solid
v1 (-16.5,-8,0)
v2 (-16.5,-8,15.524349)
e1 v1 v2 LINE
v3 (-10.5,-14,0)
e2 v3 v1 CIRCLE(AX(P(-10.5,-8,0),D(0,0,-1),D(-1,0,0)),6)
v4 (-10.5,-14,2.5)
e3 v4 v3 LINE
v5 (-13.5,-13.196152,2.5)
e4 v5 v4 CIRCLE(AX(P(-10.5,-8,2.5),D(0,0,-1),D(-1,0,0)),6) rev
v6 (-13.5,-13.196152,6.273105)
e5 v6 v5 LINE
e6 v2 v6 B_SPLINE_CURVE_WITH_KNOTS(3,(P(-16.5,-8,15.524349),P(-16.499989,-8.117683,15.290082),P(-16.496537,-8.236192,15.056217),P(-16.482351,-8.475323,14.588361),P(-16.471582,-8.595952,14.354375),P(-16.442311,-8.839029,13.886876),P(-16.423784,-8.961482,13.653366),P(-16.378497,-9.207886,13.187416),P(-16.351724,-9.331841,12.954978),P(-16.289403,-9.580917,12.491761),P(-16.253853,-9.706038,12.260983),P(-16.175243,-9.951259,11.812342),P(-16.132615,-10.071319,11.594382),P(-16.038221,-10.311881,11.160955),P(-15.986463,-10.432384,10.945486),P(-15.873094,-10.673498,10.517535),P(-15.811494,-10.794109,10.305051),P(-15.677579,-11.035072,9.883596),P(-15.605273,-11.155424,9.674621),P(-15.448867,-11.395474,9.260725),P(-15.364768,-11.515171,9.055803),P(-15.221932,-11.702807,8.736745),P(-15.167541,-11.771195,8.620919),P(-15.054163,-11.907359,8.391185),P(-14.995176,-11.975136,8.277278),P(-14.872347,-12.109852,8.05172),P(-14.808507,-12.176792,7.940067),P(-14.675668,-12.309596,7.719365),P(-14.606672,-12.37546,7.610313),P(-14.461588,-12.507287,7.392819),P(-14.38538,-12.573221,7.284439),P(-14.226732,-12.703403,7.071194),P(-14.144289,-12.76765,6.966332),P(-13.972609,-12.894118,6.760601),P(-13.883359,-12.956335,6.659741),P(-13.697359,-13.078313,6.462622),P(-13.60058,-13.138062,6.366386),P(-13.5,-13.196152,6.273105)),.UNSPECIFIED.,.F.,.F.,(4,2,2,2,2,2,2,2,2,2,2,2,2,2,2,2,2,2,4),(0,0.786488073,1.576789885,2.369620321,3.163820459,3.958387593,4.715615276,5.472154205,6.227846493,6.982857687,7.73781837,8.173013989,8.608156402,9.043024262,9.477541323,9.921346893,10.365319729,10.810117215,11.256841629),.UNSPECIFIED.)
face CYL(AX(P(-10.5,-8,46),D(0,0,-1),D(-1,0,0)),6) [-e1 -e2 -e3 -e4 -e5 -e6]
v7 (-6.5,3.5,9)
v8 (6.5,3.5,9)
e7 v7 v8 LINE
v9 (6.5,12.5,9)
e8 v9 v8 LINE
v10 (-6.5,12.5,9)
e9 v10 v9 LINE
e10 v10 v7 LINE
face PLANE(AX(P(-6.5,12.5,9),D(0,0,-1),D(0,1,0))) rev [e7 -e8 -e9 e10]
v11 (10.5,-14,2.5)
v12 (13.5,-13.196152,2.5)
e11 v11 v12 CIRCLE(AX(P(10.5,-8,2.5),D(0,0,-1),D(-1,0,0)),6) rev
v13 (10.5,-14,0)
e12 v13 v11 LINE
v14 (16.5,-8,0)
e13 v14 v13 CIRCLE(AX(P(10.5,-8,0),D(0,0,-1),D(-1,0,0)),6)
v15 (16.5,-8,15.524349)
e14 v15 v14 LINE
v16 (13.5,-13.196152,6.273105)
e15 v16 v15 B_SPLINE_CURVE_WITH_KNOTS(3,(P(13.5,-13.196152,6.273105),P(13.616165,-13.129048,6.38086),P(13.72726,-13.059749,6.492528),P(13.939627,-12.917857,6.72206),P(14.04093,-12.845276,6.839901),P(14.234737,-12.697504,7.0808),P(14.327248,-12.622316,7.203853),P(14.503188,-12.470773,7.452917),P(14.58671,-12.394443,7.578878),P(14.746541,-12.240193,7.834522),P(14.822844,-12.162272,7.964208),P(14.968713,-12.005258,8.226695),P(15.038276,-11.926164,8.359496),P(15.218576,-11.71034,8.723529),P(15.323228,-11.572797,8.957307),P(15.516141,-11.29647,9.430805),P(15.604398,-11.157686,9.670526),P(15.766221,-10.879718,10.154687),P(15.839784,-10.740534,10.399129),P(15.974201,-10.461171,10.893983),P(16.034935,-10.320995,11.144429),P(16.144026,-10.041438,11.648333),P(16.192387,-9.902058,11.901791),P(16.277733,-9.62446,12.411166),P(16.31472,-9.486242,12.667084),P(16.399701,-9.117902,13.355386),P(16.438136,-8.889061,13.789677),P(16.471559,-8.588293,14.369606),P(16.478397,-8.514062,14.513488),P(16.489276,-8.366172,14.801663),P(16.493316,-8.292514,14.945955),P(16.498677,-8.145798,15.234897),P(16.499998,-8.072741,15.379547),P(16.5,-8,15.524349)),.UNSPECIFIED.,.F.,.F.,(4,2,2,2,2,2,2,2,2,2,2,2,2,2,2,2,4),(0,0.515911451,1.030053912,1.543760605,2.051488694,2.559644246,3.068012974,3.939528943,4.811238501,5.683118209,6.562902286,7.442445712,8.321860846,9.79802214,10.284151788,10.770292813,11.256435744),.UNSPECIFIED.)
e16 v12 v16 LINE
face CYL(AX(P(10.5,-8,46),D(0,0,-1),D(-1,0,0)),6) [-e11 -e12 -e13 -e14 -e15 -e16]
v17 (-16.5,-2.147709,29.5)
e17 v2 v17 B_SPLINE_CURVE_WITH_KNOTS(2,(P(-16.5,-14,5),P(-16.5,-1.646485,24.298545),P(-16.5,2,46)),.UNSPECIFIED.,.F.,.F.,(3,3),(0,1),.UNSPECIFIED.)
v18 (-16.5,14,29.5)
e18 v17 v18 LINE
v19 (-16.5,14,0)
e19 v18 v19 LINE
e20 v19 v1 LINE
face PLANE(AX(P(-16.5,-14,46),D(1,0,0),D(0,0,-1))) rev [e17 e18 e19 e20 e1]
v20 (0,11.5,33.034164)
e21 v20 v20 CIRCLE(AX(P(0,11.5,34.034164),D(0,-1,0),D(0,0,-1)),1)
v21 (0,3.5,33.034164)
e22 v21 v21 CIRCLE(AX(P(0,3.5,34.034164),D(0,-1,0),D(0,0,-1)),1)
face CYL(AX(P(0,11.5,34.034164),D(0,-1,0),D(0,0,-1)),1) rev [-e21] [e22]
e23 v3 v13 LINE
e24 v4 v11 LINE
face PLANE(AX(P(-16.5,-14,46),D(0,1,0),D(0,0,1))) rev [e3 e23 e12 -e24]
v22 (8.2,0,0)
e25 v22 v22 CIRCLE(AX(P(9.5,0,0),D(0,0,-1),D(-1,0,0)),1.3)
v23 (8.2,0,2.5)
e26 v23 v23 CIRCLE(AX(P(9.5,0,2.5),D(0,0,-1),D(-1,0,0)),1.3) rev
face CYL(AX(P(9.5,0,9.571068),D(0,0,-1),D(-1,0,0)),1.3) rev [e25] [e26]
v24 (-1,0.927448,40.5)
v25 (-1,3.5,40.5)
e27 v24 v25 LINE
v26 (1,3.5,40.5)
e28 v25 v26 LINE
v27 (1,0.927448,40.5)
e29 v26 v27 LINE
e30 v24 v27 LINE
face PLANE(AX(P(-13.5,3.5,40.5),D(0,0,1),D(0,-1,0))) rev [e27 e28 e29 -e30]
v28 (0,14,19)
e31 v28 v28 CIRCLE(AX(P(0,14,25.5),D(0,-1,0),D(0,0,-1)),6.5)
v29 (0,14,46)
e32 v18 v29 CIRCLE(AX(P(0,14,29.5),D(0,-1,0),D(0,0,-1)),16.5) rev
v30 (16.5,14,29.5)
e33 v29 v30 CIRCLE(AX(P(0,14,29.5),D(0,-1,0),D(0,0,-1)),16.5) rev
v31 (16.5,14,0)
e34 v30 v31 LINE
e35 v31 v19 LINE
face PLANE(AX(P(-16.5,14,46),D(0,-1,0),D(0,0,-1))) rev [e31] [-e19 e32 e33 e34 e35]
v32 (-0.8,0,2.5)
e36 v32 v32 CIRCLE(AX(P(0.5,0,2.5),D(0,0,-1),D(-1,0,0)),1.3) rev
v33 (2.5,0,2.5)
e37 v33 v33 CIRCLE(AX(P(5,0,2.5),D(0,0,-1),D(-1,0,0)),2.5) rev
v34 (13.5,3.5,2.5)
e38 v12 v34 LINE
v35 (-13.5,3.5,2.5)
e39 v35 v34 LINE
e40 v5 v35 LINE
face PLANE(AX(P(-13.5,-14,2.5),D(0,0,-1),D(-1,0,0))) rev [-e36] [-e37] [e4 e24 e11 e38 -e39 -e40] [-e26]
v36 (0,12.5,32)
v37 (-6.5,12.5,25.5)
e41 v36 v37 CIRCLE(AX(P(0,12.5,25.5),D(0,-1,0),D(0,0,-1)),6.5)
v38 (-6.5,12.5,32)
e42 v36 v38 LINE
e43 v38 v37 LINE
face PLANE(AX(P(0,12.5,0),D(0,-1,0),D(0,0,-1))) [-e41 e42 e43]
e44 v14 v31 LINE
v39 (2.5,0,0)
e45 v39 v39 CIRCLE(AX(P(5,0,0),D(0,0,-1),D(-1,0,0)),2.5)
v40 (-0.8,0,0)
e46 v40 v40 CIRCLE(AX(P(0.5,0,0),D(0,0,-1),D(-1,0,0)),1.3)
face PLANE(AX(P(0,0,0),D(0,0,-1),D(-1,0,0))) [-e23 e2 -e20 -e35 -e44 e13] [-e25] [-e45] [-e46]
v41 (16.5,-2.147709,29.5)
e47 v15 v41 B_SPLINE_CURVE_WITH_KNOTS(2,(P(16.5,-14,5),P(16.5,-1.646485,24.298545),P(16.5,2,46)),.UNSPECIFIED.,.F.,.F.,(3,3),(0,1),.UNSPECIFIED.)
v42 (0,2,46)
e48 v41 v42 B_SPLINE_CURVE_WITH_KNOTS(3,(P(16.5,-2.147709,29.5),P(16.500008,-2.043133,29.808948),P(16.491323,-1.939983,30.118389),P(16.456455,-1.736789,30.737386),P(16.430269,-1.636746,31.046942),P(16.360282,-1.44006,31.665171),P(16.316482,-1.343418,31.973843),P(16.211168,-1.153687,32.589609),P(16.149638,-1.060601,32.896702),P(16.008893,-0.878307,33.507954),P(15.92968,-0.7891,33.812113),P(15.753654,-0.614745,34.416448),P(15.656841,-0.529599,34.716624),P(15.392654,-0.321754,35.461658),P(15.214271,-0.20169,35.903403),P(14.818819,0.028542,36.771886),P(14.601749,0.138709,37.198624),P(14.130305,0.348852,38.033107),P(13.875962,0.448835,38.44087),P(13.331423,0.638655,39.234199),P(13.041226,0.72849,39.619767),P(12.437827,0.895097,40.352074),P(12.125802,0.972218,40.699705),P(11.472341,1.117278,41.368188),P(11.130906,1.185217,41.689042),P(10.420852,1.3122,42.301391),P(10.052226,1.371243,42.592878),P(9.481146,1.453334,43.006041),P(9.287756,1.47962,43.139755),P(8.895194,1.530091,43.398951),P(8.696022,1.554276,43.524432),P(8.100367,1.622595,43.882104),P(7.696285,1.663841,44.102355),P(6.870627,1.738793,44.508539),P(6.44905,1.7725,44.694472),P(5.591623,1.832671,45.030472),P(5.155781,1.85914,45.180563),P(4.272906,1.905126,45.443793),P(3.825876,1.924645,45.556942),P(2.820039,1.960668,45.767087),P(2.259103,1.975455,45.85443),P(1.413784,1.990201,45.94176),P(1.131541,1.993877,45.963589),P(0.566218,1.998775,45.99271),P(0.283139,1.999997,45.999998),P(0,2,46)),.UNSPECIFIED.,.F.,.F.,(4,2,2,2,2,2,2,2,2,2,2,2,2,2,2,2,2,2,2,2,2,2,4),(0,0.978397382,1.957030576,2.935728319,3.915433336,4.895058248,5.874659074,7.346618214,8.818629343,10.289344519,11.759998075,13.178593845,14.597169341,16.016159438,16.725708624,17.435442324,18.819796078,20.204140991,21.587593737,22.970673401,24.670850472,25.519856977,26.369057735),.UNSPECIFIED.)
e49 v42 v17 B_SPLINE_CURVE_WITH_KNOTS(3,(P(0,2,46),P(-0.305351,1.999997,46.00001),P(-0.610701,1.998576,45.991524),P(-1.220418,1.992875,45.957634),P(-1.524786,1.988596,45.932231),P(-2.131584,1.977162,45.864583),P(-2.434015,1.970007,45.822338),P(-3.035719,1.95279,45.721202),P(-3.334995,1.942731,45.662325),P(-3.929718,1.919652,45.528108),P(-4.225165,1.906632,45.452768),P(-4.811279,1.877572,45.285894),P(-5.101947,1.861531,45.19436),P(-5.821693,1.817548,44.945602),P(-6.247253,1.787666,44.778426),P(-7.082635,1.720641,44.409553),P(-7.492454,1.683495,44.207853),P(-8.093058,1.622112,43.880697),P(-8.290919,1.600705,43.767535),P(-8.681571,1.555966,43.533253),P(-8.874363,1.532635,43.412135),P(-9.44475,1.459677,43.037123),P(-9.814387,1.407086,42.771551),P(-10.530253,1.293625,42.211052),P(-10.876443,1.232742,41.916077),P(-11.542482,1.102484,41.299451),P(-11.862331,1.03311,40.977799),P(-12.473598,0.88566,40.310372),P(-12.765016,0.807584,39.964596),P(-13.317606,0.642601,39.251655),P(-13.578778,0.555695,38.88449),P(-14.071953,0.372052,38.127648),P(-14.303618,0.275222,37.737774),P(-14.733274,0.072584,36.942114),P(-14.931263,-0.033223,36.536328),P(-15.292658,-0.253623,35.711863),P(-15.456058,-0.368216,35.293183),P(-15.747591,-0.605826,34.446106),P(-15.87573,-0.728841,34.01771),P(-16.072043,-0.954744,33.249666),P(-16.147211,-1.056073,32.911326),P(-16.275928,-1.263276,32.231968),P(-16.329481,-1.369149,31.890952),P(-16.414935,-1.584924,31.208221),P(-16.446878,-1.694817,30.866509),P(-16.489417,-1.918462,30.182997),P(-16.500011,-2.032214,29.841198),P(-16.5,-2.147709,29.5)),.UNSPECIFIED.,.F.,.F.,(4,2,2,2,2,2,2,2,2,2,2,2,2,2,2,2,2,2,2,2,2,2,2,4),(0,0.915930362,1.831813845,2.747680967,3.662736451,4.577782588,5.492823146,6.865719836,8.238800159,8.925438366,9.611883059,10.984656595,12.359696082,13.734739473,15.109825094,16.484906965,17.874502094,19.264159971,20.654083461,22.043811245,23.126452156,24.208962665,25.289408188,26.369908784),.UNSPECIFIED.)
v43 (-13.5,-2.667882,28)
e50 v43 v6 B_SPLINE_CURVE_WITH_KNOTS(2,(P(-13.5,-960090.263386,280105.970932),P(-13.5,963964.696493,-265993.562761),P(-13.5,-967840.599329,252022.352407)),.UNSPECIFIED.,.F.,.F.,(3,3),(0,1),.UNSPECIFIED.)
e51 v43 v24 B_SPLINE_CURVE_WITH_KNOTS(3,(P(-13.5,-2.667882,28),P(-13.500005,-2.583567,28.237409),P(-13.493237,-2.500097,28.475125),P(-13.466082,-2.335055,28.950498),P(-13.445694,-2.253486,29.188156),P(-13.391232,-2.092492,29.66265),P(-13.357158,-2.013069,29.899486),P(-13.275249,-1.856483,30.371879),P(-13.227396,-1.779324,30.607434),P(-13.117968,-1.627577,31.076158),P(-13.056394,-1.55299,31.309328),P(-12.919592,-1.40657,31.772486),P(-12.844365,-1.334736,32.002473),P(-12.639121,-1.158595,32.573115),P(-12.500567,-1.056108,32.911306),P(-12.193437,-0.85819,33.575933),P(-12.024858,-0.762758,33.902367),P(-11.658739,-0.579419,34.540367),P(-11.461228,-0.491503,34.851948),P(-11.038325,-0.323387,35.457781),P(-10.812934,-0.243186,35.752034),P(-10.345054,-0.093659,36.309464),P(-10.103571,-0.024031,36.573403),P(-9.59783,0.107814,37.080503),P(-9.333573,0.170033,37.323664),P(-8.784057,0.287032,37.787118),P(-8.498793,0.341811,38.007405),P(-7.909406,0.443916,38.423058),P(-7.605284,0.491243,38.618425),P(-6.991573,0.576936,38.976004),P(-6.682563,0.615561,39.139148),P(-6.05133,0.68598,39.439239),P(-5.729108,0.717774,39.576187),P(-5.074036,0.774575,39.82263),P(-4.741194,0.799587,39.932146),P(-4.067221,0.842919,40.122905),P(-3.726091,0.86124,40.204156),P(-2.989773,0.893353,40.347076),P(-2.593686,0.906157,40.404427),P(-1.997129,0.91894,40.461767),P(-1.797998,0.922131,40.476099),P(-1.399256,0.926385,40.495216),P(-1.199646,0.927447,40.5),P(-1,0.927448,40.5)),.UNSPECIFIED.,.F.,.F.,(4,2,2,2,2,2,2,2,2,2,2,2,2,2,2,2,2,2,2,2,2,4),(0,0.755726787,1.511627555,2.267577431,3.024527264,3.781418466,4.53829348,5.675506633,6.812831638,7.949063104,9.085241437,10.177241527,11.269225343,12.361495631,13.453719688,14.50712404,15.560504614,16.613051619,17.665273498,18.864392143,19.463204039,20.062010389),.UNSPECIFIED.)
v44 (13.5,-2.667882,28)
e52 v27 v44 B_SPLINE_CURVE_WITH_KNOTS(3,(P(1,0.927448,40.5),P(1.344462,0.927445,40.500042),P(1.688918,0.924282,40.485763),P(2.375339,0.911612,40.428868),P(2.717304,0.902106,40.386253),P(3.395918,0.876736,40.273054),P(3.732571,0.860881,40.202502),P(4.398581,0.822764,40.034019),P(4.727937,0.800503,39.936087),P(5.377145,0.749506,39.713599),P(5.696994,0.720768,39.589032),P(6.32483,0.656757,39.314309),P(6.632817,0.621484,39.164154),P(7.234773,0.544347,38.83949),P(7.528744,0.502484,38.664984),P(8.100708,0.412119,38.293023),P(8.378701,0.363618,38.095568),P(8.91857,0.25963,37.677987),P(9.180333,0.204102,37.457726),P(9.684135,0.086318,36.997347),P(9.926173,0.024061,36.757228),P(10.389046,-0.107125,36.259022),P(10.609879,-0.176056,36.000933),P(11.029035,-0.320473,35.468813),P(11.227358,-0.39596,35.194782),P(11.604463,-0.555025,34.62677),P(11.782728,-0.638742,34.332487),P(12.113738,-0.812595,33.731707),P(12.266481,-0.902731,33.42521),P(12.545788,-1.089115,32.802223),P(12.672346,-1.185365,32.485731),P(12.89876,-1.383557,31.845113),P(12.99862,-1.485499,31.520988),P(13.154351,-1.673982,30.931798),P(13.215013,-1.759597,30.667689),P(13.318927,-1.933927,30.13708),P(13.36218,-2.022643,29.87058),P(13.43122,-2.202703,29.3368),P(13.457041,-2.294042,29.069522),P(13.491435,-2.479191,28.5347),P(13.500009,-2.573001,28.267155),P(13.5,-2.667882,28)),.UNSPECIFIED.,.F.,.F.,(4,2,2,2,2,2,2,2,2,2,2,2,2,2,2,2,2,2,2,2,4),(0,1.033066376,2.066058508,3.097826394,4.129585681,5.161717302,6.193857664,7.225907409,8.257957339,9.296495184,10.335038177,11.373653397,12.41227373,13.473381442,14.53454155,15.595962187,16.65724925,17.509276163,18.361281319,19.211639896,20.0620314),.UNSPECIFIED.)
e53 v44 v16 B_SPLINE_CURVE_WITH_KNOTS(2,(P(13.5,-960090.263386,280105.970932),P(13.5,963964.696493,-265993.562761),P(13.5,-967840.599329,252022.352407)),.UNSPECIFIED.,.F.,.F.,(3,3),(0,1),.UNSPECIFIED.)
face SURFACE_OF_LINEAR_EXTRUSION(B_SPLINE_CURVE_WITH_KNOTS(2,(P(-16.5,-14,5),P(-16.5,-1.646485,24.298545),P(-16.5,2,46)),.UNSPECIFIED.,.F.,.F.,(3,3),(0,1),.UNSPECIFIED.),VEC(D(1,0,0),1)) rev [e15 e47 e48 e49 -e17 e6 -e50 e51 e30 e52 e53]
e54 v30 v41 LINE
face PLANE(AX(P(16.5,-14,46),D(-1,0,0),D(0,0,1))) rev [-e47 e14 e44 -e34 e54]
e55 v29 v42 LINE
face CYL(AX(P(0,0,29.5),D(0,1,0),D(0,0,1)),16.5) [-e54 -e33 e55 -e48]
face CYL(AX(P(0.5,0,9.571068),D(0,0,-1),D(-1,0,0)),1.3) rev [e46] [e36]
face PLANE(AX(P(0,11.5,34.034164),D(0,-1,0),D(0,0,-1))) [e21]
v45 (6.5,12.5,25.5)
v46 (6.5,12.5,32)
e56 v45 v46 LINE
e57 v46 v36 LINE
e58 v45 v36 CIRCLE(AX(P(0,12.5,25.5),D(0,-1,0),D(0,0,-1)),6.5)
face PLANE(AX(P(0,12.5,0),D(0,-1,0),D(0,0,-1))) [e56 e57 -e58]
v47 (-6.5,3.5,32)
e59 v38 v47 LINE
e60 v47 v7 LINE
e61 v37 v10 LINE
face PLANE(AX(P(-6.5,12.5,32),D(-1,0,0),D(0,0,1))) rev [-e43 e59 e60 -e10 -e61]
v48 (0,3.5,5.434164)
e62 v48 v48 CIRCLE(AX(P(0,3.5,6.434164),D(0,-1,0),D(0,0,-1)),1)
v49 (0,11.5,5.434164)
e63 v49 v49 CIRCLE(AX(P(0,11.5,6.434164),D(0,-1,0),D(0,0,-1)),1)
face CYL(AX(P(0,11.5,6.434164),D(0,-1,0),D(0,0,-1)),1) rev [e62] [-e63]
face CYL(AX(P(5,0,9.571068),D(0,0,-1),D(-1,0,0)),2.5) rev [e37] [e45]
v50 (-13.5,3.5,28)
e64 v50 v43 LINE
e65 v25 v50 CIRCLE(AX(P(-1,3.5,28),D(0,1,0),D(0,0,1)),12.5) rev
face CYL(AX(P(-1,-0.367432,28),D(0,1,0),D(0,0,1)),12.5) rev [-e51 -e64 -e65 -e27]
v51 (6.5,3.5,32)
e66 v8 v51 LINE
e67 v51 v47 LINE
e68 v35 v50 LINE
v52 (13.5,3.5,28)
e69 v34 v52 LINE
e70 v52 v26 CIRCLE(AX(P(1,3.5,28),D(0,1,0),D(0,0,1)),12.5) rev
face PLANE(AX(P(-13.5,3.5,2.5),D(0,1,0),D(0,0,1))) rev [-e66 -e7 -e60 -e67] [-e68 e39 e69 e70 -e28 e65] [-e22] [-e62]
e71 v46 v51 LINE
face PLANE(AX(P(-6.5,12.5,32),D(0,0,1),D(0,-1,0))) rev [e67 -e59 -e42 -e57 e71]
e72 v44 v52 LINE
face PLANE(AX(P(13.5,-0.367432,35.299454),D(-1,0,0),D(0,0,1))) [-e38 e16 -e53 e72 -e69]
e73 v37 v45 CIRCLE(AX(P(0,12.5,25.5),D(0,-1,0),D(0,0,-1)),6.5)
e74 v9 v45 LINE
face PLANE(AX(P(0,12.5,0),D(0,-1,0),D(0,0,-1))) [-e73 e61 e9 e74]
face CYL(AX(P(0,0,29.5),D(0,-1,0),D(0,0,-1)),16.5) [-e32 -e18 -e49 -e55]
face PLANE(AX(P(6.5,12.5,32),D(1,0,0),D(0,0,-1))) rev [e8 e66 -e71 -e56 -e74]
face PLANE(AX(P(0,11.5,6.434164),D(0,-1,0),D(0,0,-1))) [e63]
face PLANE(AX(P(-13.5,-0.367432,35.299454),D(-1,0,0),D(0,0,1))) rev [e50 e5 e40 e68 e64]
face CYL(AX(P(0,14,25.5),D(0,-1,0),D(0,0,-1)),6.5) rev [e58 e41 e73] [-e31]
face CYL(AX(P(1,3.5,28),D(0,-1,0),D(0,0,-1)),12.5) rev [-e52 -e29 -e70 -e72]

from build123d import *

# Parameters (mm, degrees)
SKETCH1_W           = 33
SKETCH1_H           = 28
BOSS_EXTRUDE1_DEPTH = 46
CUT_EXTRUDE1_DEPTH  = 59.318093247
CUT_EXTRUDE2_START  = -3
CUT_EXTRUDE2_DEPTH  = 27
FILLET1_R           = 12.5
FILLET2_R           = 16.5
FILLET3_R           = 6
SKETCH4_W           = 13
SKETCH4_H           = 23
CUT_EXTRUDE3_DEPTH  = 9
SKETCH5_R           = 6.5
CUT_EXTRUDE4_DEPTH  = 56.592265809
SKETCH6_R           = 1
CUT_EXTRUDE5_DEPTH  = 8
SKETCH7_R           = 1.3
SKETCH7_R_2         = 2.5
CUT_EXTRUDE6_DEPTH  = 2.5


with BuildPart() as part:
    # Sketch1 → Boss-Extrude1 (new body)
    with BuildSketch(Plane.XY):
        Rectangle(SKETCH1_W, SKETCH1_H)
    extrude(amount=BOSS_EXTRUDE1_DEPTH)

    # Sketch2 → Cut-Extrude1 (cut, through all)
    with BuildSketch(Plane(origin=(16.5, 0, 0), x_dir=(0, 0, -1), z_dir=(1, 0, 0))):
        with BuildLine():
            Line((-5, -14), (-46, -14))
            Line((-46, -14), (-46, 2))
            add(Edge.make_bspline(
                [(-46, 2), (-24.29854511, -1.646485385), (-5, -14)],
                knots=[0, 0, 0, 1, 1, 1], degree=2))
        make_face()
    extrude(amount=-CUT_EXTRUDE1_DEPTH, mode=Mode.SUBTRACT)

    # Sketch3 → Cut-Extrude2 (cut)
    with BuildSketch(Plane(origin=(16.5, 0, 0), x_dir=(0, 0, -1), z_dir=(1, 0, 0)).offset(CUT_EXTRUDE2_START)):
        with BuildLine():
            Line((-5, -14), (-2.5, -14))
            Line((-2.5, -14), (-2.5, 3.5))
            Line((-2.5, 3.5), (-40.5, 3.5))
            Line((-40.5, 3.5), (-40.5, 0.927448298))
            add(Edge.make_bspline(
                [(-5, -14), (-21.835639292, -3.223057237), (-40.5, 0.927448298)],
                knots=[0, 0, 0, 1, 1, 1], degree=2))
        make_face()
    extrude(amount=-CUT_EXTRUDE2_DEPTH, mode=Mode.SUBTRACT)

    # Fillet1
    fillet1_edges = [part.edges().sort_by_distance(p)[0] for p in [
        (13.5, 2.213724149, 40.5),
        (-13.5, 2.213724149, 40.5),
    ]]
    fillet(fillet1_edges, radius=FILLET1_R)

    # Fillet2
    fillet2_edges = [part.edges().sort_by_distance(p)[0] for p in [
        (16.5, 8, 46),
        (-16.5, 8, 46),
    ]]
    fillet(fillet2_edges, radius=FILLET2_R - 0.0001)  # a hair under: the kernel refuses the full size

    # Fillet3
    fillet3_edges = [part.edges().sort_by_distance(p)[0] for p in [
        (16.5, -14, 2.5),
        (-16.5, -14, 2.5),
    ]]
    fillet(fillet3_edges, radius=FILLET3_R)

    # Sketch4 → Cut-Extrude3 (cut)
    with BuildSketch(Plane.XZ.offset(-3.5)):
        with Locations((0, 20.5)):
            Rectangle(SKETCH4_W, SKETCH4_H)
    extrude(amount=-CUT_EXTRUDE3_DEPTH, mode=Mode.SUBTRACT)

    # Sketch5 → Cut-Extrude4 (cut, through all)
    with BuildSketch(Plane.XZ.offset(-12.5)):
        with Locations(Location((0, 25.5, 0), (0, 0, 270))):
            Circle(SKETCH5_R)
    extrude(amount=-CUT_EXTRUDE4_DEPTH, mode=Mode.SUBTRACT)

    # Sketch6 → Cut-Extrude5 (cut)
    with BuildSketch(Plane.XZ.offset(-3.5)):
        with Locations(Location((0, 34.034163798, 0), (0, 0, 270))):
            Circle(SKETCH6_R)
        with Locations(Location((0, 6.434163798, 0), (0, 0, 270))):
            Circle(SKETCH6_R)
    extrude(amount=-CUT_EXTRUDE5_DEPTH, mode=Mode.SUBTRACT)

    # Sketch7 → Cut-Extrude6 (cut)
    with BuildSketch(Plane(origin=(0, 0, 0), x_dir=(-1, 0, 0), z_dir=(0, 0, -1))):
        with Locations((-0.5, 0)):
            Circle(SKETCH7_R)
        with Locations((-5, 0)):
            Circle(SKETCH7_R_2)
        with Locations((-9.5, 0)):
            Circle(SKETCH7_R)
    extrude(amount=-CUT_EXTRUDE6_DEPTH, mode=Mode.SUBTRACT)


solid = part.part
